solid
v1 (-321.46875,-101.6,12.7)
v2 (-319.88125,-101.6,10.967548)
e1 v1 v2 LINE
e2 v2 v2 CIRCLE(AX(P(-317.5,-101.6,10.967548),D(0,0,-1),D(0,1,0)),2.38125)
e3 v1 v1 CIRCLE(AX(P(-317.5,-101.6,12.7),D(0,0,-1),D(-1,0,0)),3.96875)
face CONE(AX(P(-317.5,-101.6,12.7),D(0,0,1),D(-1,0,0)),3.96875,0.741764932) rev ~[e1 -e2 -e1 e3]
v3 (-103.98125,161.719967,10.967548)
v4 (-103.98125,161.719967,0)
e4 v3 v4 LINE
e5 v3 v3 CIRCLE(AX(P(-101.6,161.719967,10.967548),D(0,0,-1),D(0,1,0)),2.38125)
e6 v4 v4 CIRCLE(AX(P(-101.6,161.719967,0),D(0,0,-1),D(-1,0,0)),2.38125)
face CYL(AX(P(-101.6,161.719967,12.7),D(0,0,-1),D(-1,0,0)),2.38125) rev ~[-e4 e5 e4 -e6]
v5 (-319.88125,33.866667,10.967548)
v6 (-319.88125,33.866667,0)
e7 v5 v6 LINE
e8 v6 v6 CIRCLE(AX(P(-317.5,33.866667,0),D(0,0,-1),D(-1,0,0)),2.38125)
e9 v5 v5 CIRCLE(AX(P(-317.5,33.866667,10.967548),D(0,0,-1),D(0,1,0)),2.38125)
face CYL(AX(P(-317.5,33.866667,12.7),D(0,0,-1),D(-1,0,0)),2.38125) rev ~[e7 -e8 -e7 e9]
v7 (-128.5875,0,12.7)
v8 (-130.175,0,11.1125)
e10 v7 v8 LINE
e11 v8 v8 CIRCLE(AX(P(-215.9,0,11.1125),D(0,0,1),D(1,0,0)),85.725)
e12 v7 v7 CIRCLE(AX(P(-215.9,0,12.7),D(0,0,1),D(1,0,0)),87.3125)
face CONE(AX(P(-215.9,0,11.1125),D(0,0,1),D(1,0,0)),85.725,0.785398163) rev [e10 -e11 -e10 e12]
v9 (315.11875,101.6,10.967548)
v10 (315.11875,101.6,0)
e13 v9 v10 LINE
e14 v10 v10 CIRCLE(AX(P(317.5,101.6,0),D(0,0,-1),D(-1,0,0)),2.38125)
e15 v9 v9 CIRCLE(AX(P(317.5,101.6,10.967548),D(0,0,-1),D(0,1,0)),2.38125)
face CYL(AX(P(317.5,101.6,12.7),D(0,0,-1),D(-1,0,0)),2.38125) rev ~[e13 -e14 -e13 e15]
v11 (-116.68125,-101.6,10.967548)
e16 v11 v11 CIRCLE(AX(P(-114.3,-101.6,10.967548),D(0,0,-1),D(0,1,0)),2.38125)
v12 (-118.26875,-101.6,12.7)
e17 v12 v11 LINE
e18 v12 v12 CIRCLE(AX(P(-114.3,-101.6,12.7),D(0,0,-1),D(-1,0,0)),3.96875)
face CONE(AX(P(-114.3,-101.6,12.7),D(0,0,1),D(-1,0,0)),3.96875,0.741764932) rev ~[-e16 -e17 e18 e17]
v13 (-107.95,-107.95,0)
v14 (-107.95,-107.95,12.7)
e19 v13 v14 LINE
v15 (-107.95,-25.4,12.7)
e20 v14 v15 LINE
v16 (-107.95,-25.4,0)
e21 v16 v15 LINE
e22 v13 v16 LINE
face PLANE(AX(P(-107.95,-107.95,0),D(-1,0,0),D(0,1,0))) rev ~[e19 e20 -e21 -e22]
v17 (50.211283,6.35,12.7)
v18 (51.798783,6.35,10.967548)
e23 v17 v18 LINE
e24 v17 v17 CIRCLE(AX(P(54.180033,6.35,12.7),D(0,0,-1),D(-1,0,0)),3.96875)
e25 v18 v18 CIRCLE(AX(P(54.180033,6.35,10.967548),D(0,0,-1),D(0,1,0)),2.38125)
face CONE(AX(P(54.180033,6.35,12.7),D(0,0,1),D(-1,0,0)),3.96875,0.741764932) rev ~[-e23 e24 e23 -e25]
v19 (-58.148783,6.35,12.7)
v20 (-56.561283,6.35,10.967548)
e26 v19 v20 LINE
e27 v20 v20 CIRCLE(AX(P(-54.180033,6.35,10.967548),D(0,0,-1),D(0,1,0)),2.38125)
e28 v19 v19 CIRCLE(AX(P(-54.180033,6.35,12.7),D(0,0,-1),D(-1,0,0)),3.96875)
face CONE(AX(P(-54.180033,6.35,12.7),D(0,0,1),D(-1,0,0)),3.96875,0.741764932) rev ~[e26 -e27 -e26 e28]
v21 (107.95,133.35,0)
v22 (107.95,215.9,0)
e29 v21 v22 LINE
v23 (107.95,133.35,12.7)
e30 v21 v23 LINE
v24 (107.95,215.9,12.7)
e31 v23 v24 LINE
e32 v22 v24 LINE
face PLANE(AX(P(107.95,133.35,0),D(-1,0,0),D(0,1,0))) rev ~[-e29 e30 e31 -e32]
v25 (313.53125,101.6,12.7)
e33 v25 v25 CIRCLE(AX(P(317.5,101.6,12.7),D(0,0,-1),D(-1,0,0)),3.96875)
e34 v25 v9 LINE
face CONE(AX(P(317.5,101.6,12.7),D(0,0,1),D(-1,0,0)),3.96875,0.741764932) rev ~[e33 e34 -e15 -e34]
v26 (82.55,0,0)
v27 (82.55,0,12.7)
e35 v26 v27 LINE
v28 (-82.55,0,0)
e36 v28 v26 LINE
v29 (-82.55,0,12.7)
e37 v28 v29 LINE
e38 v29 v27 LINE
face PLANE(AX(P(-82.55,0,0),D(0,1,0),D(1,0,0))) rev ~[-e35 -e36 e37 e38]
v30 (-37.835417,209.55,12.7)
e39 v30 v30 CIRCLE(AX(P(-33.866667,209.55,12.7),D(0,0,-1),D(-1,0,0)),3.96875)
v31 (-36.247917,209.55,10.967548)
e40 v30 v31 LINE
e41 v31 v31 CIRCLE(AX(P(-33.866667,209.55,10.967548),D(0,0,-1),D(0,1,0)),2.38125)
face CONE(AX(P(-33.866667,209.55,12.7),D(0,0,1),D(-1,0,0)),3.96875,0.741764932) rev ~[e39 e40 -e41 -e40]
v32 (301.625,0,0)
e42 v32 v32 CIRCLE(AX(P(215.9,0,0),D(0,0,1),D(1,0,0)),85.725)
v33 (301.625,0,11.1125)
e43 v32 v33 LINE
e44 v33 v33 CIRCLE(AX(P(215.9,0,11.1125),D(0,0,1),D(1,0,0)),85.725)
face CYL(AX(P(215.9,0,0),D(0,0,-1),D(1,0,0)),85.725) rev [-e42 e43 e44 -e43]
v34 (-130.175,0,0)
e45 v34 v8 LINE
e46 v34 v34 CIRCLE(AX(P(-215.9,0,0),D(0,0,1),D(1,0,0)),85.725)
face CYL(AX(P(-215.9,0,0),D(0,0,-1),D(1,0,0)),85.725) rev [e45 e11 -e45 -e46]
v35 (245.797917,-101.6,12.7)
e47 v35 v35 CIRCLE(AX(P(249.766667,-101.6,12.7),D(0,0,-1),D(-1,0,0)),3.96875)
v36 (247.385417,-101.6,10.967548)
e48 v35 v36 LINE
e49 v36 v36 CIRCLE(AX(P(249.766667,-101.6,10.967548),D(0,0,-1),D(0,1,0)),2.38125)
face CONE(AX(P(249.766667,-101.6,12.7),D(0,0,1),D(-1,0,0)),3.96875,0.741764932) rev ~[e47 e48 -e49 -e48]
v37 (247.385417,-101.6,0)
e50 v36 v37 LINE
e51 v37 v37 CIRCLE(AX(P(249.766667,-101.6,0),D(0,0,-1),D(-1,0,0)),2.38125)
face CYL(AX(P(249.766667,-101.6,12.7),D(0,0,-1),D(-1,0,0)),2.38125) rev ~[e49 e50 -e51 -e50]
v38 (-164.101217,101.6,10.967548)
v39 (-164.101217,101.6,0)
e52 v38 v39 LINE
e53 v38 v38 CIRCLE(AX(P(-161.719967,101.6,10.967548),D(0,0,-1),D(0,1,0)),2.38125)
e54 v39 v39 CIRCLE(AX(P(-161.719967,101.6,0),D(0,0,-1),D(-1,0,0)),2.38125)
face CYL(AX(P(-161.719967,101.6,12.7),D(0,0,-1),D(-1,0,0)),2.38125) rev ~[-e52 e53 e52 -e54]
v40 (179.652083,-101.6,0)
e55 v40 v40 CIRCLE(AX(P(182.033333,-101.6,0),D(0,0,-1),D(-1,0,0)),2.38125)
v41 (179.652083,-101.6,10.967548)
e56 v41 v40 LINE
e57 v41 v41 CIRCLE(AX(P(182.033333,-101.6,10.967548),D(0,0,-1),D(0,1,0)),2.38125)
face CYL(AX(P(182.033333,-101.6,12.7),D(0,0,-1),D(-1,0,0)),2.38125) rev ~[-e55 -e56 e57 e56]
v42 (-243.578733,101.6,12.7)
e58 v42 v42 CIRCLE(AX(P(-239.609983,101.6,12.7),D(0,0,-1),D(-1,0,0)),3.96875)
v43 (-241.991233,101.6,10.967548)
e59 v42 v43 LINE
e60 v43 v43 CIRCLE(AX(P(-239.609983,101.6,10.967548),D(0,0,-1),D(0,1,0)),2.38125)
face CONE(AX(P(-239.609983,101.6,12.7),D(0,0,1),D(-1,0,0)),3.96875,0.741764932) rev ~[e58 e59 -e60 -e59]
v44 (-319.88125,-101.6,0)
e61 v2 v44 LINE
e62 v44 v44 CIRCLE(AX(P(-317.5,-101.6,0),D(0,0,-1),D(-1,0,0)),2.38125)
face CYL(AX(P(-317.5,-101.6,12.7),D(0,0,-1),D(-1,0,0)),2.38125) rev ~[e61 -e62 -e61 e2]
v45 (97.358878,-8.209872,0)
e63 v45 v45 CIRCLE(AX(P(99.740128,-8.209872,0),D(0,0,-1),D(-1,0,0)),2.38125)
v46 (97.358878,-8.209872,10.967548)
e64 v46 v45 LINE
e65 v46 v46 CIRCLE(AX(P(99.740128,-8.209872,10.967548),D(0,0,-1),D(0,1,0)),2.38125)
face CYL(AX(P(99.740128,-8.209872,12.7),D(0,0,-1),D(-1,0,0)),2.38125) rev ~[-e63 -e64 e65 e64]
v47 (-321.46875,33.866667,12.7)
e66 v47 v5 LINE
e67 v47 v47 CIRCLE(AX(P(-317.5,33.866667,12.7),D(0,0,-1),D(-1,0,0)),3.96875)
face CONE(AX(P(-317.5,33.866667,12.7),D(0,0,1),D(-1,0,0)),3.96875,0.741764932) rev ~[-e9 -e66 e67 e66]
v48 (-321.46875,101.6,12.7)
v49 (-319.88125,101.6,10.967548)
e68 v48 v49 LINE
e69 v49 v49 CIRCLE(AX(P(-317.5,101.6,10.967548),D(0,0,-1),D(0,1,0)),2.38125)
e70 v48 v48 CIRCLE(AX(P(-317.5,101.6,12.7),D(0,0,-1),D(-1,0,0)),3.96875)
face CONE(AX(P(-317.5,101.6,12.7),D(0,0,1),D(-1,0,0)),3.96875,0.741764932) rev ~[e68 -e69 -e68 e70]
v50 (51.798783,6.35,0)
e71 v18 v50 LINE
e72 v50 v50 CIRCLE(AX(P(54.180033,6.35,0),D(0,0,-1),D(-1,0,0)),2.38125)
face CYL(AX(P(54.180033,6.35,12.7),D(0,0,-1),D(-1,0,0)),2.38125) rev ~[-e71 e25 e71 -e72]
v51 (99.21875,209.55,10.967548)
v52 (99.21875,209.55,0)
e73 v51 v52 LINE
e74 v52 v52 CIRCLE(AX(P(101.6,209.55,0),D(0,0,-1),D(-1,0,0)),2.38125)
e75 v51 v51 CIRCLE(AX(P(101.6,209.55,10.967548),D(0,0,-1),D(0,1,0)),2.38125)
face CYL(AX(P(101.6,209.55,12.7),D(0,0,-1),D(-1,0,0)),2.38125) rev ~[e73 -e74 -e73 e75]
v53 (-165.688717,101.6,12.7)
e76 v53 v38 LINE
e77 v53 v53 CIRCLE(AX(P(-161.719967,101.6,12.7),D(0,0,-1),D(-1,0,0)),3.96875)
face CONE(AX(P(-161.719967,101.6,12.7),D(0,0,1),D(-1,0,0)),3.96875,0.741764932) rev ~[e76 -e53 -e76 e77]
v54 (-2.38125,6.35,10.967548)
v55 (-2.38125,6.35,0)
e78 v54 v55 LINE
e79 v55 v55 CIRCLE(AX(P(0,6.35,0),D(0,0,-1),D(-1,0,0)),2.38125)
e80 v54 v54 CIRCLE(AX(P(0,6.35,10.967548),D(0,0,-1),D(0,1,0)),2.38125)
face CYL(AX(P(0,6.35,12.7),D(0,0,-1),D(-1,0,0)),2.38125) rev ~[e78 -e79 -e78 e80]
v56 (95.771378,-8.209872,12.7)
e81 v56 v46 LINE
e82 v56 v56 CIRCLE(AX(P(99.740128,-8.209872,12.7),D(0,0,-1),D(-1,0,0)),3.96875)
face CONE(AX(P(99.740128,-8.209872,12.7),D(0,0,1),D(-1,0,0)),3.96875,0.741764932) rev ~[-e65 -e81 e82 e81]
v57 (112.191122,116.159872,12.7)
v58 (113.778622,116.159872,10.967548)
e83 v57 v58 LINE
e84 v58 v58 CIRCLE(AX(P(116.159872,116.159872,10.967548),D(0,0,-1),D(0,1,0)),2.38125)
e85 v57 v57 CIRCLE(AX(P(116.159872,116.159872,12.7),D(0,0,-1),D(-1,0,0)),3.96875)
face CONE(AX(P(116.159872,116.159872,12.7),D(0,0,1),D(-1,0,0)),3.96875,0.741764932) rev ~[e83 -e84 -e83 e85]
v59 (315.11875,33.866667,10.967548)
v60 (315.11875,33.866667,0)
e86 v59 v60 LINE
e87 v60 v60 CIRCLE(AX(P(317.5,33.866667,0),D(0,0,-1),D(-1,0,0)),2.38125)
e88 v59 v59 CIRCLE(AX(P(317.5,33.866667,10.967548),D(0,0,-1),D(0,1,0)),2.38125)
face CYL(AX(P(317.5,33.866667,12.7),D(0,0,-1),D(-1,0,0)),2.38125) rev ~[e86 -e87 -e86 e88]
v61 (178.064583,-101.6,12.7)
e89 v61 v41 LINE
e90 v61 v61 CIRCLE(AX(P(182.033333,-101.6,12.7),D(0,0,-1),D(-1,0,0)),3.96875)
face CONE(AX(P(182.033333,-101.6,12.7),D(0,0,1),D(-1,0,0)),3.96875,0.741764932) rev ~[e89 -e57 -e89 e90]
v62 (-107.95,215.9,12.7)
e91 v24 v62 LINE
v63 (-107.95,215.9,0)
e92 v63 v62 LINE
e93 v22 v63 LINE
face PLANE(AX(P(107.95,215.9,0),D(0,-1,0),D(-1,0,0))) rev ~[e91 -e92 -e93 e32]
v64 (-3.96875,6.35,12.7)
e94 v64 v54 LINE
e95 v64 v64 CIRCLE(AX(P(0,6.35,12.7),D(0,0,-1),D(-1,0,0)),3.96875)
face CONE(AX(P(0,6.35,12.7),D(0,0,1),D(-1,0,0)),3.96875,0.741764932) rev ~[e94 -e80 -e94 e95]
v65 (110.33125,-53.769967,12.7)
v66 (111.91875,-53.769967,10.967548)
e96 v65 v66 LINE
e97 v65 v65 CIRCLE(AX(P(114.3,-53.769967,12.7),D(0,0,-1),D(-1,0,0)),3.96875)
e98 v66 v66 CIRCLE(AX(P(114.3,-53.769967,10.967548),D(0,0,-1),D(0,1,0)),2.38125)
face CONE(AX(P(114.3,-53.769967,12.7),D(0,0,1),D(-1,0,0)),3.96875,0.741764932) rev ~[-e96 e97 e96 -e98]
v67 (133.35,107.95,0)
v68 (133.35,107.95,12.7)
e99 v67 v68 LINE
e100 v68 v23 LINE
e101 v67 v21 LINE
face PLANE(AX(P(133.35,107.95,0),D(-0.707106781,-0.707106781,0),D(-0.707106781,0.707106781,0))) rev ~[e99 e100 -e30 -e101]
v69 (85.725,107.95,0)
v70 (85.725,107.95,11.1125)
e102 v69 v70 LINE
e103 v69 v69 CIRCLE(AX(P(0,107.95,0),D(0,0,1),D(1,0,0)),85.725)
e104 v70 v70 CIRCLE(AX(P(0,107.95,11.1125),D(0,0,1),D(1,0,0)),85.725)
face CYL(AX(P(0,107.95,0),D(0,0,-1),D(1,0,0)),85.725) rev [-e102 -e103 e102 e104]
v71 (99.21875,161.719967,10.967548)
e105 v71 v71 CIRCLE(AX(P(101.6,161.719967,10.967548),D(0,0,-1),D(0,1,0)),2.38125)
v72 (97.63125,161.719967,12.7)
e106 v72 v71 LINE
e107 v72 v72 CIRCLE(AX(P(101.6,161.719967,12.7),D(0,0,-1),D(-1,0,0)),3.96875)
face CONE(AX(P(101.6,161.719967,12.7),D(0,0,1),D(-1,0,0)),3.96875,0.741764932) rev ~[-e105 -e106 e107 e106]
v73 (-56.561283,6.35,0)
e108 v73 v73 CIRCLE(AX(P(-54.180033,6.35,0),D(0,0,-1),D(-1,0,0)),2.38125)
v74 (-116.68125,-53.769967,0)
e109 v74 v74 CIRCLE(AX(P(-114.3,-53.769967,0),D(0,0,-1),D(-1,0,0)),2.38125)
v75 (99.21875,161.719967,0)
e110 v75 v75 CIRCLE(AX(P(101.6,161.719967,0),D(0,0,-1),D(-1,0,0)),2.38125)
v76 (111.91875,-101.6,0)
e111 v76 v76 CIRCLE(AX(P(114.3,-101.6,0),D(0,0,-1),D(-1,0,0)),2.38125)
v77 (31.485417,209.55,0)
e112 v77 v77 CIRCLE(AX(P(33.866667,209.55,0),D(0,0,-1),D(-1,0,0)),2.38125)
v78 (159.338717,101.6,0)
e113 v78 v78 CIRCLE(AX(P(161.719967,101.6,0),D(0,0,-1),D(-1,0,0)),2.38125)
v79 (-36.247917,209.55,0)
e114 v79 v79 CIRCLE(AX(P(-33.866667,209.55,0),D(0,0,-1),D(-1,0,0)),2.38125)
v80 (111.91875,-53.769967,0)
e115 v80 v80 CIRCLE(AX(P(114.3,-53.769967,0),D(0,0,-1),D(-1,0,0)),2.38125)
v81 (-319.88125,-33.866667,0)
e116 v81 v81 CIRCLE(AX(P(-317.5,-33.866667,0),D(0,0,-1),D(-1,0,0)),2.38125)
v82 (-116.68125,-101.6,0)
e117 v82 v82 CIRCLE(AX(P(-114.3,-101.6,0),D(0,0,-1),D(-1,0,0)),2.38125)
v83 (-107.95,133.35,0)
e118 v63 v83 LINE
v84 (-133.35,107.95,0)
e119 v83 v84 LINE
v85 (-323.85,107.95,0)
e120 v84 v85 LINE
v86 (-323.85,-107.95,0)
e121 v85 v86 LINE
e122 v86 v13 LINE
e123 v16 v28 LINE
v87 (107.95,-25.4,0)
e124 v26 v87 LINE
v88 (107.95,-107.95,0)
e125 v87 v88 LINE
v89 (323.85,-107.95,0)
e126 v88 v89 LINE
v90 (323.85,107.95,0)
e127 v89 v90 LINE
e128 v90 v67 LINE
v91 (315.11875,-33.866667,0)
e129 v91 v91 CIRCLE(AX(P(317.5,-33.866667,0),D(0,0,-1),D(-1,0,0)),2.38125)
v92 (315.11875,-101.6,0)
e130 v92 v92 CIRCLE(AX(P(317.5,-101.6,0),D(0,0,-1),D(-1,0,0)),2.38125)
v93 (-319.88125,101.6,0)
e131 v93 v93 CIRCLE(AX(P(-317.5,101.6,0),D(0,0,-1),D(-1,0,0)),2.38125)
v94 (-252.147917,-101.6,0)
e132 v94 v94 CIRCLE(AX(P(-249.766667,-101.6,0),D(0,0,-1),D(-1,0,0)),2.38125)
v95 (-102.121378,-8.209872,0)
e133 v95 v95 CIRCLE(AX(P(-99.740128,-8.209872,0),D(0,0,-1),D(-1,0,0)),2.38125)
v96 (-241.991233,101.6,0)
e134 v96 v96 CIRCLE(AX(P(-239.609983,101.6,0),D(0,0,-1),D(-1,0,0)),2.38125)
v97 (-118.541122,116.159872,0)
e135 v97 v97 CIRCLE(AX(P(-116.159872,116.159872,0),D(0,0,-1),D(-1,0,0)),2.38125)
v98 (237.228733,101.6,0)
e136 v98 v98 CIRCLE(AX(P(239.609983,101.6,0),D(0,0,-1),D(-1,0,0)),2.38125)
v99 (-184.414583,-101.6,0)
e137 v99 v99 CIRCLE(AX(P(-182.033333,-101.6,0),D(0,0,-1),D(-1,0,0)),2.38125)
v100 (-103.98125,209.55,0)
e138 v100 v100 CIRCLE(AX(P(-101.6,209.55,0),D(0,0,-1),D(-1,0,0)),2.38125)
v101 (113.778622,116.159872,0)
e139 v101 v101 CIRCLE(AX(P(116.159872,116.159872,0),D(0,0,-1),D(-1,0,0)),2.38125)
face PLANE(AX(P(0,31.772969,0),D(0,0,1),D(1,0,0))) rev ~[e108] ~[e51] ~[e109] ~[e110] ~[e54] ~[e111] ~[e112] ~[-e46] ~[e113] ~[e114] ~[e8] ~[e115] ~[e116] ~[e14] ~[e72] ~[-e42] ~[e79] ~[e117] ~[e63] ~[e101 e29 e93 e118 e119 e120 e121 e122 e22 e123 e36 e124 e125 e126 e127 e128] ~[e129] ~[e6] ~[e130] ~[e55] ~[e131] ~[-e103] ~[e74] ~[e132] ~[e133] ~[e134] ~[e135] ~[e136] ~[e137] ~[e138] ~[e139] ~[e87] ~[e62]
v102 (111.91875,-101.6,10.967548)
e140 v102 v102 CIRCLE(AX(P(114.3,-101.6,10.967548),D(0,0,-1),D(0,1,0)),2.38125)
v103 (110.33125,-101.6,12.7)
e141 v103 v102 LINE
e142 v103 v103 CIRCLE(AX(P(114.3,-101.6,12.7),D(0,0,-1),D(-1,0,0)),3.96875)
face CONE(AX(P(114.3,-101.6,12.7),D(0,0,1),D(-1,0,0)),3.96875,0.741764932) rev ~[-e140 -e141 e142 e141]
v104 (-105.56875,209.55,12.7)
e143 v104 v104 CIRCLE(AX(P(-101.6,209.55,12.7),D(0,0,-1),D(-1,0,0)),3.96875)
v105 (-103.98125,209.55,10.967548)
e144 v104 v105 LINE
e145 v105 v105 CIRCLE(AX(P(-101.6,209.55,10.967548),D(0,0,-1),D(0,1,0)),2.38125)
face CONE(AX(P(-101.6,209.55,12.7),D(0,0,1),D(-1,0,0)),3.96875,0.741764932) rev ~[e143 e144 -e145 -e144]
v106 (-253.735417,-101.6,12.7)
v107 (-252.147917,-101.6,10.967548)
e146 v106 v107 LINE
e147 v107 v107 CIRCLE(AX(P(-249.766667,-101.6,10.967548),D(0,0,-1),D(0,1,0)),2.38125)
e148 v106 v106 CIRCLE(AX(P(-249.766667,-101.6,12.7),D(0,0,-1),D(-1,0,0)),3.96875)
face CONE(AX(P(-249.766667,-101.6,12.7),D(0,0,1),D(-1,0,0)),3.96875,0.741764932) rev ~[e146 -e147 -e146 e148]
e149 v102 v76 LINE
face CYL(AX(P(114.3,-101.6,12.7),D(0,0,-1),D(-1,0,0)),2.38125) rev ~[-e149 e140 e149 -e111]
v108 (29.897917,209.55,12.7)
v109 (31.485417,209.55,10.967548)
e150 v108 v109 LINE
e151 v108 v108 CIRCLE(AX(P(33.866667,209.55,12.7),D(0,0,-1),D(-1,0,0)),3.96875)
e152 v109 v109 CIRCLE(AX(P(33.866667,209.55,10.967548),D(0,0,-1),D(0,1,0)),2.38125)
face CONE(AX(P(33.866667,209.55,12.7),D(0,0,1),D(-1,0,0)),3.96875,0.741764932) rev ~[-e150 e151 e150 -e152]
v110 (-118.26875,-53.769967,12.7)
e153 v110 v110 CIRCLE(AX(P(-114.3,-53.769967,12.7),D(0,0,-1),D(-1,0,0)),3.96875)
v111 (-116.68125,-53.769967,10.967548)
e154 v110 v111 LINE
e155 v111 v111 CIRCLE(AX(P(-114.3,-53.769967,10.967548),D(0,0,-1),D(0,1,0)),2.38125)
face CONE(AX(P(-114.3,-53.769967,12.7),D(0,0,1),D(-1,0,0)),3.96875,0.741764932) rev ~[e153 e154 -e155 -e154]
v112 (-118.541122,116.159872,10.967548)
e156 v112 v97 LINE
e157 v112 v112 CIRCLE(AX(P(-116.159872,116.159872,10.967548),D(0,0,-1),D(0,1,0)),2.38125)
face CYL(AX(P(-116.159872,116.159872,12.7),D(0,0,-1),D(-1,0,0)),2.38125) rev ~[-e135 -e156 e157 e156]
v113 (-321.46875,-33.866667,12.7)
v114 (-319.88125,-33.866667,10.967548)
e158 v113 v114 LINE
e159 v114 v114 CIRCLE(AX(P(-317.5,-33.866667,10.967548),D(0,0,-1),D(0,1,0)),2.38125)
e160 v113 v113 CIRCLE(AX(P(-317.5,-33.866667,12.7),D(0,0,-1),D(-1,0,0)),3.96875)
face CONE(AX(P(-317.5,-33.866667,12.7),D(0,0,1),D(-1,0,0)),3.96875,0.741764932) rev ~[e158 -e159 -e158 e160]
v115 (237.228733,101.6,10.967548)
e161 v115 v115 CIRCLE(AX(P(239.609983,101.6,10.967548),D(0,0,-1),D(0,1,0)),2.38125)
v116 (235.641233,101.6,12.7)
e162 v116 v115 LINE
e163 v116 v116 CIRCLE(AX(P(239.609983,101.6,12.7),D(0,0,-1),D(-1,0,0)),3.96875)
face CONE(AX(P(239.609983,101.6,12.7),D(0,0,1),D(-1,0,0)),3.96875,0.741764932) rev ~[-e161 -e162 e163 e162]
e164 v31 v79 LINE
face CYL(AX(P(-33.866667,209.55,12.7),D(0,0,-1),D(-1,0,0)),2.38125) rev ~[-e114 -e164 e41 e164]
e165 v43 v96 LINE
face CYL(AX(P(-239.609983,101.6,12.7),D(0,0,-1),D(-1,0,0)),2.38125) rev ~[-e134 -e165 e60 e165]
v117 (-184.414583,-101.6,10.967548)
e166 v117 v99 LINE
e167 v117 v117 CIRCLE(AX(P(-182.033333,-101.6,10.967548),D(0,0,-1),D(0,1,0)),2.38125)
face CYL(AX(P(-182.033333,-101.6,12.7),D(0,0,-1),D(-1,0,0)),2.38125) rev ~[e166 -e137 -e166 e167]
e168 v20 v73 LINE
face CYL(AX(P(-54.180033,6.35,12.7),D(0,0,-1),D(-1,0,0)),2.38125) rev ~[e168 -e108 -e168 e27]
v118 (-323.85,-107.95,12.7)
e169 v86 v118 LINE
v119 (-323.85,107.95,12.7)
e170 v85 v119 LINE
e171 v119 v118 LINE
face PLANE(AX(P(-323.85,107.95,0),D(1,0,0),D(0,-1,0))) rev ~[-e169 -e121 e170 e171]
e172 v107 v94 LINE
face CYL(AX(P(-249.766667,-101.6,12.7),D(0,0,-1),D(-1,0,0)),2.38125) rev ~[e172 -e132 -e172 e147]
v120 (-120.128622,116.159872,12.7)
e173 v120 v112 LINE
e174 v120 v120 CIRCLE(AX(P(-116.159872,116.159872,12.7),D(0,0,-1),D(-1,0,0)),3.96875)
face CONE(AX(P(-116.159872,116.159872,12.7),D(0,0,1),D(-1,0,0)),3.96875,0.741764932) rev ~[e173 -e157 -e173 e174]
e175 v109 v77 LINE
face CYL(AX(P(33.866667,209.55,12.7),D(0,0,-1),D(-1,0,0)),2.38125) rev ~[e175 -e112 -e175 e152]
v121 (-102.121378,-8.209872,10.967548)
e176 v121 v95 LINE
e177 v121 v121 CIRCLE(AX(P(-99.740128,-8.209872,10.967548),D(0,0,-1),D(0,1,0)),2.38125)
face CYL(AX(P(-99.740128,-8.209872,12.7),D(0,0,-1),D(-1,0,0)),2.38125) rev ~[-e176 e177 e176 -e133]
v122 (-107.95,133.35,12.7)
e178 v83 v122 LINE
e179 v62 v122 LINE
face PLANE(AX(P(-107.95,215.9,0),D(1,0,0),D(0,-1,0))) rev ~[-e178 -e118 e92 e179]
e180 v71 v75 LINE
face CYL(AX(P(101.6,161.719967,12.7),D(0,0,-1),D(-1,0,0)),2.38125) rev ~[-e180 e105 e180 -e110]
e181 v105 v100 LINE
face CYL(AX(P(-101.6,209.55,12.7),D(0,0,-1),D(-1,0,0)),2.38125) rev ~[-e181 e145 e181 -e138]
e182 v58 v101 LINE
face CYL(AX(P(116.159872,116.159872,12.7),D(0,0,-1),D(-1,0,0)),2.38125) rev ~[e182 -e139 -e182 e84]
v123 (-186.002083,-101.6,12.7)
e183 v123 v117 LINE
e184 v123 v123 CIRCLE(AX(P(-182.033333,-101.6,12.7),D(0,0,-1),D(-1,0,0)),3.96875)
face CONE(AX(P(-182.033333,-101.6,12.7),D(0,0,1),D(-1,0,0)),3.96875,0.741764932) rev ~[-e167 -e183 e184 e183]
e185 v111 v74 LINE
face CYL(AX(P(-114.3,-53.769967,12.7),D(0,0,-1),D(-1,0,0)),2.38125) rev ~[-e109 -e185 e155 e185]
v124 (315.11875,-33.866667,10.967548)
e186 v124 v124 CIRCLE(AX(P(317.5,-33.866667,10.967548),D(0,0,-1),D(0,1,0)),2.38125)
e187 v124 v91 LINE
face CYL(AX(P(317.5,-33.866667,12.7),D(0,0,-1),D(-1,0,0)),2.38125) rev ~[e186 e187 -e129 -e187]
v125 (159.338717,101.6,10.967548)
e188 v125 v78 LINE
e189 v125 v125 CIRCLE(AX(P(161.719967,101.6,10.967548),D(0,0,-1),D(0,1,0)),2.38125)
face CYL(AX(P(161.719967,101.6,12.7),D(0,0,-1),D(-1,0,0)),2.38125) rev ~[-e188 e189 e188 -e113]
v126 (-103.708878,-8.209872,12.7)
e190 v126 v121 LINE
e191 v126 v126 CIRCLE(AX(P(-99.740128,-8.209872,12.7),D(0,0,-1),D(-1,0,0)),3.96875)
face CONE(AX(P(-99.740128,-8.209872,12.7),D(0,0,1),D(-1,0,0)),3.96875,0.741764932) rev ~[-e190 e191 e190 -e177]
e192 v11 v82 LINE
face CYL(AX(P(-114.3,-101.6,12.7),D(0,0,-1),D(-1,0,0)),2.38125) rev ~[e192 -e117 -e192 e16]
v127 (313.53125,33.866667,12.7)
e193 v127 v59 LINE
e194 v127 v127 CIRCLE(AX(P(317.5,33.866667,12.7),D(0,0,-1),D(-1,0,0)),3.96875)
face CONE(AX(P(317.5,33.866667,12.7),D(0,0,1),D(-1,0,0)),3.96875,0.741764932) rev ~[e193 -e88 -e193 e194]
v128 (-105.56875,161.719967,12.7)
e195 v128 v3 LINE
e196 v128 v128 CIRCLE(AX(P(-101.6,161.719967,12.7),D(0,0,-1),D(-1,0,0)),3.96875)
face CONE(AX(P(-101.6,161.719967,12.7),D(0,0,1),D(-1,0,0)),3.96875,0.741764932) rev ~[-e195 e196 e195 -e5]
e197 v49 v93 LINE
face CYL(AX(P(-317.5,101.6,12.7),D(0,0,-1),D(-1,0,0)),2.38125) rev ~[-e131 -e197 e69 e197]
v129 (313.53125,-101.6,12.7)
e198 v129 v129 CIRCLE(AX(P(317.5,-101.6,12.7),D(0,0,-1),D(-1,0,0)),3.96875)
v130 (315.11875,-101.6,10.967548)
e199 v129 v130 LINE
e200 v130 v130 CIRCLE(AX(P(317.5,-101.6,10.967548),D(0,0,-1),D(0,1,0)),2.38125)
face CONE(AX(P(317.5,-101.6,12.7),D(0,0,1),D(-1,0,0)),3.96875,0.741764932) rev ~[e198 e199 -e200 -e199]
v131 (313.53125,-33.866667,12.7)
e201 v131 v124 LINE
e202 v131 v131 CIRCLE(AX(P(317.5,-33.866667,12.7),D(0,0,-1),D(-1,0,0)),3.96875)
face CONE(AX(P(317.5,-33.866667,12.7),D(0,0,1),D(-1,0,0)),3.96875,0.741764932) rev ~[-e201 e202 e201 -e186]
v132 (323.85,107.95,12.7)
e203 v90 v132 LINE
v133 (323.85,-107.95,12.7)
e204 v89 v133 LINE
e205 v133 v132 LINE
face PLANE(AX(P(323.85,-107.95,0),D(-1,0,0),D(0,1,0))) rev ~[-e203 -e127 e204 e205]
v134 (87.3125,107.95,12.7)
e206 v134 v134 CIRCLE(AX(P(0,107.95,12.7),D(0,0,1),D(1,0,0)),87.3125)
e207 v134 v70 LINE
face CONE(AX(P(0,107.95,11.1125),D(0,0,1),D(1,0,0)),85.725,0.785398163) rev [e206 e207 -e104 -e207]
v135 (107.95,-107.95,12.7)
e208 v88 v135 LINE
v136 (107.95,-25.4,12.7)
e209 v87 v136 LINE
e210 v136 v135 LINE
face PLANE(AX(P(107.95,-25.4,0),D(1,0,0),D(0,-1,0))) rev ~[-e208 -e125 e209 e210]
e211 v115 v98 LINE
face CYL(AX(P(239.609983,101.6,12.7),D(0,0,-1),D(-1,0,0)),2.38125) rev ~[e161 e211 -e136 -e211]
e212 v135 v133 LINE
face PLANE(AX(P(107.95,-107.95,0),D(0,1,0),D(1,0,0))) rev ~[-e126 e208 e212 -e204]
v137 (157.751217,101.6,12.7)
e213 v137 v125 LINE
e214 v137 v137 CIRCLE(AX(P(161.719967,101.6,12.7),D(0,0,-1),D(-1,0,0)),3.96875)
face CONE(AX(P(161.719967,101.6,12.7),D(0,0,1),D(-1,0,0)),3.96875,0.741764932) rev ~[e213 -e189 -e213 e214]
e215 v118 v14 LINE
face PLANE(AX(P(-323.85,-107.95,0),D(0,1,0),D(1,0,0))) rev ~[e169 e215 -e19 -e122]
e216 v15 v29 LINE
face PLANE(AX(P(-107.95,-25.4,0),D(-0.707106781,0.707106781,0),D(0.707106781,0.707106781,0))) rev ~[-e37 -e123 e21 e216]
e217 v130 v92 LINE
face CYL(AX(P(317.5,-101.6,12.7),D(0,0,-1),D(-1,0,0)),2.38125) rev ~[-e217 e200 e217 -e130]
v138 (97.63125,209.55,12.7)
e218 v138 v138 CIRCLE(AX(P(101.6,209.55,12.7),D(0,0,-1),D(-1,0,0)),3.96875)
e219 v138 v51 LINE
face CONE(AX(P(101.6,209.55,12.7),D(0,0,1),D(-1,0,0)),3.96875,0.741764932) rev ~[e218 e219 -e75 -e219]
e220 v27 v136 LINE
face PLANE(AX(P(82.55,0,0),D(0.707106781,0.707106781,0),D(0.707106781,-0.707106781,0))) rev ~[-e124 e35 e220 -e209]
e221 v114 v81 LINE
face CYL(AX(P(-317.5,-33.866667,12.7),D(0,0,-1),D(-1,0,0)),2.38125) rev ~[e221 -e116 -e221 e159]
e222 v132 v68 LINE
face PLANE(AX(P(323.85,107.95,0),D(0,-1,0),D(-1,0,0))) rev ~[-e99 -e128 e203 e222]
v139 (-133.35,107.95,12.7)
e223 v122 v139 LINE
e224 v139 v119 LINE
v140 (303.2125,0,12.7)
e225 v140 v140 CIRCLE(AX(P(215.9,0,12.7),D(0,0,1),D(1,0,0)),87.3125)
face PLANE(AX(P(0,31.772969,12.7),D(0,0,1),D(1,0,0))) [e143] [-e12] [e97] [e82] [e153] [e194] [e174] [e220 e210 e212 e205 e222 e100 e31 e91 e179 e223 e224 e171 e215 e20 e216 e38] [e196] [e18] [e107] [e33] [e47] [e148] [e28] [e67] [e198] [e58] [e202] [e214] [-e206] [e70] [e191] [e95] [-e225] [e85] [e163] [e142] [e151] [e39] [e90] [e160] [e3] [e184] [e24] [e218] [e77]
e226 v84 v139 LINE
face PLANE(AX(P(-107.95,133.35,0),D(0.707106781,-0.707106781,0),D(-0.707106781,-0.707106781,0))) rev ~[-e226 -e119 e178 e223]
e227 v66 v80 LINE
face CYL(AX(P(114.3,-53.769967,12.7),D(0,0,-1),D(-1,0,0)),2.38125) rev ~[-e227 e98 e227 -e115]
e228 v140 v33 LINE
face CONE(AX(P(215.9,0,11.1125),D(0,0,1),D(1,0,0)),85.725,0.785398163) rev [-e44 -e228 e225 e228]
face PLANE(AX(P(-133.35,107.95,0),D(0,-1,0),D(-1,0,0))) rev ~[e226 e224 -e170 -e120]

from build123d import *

# Parameters (mm, degrees)
F0_R           = 85.725
F1_DEPTH       = 12.7
F3_D           = 4.7625
F3_CSINK_D     = 7.9375
F3_CSINK_ANGLE = 85
F4_SIZE        = 1.5875


# Not quite as in the source:
# - a feature names something its author has since deleted; it is built from what else it names


with BuildPart() as f1:
    # F0 (on Top) → F1 (new body)
    with BuildSketch(Plane.XY):
        Polygon((-107.95, 133.35), (-133.35, 107.95), (-323.85, 107.95), (-323.85, -107.95), (-107.95, -107.95), (-107.95, -25.4), (-82.55, 0), (82.55, 0), (107.95, -25.4), (107.95, -107.95), (323.85, -107.95), (323.85, 107.95), (133.35, 107.95), (107.95, 133.35), (107.95, 215.9), (-107.95, 215.9), align=None)
        with Locations((-215.9, 0)):
            Circle(F0_R, mode=Mode.SUBTRACT)
        with Locations((215.9, 0)):
            Circle(F0_R, mode=Mode.SUBTRACT)
        with Locations((0, 107.95)):
            Circle(F0_R, mode=Mode.SUBTRACT)
    extrude(amount=F1_DEPTH)

    # F3 (through all)
    with Locations(Plane.XY.offset(12.7)):
        with Locations((-239.6099832965, 101.6), (-161.7199665929, 101.6), (-116.1598719395, 116.1598719395), (-101.6, 161.7199665929), (-101.6, 209.55), (-33.8666666667, 209.55), (33.8666666667, 209.55), (101.6, 209.55), (101.6, 161.7199665929), (116.1598719395, 116.1598719395), (161.7199665929, 101.6), (239.6099832965, 101.6), (317.5, 33.8666666667), (317.5, 101.6), (317.5, -33.8666666667), (317.5, -101.6), (249.7666666667, -101.6), (182.0333333333, -101.6), (114.3, -53.7699665929), (114.3, -101.6), (99.7401280605, -8.2098719395), (54.1800334071, 6.35), (0, 6.35), (-54.1800334071, 6.35), (-99.7401280605, -8.2098719395), (-114.3, -53.7699665929), (-114.3, -101.6), (-182.0333333333, -101.6), (-249.7666666667, -101.6), (-317.5, -101.6), (-317.5, -33.8666666667), (-317.5, 33.8666666667), (-317.5, 101.6)):
            CounterSinkHole(F3_D / 2, F3_CSINK_D / 2, counter_sink_angle=F3_CSINK_ANGLE)

    # F4
    f4_edges = [f1.edges().sort_by_distance(p)[0] for p in [
        (-85.725, 107.95, 12.7),
        (-301.625, 0, 12.7),
        (130.175, 0, 12.7),
    ]]
    chamfer(f4_edges, length=F4_SIZE)


solid = f1.part
